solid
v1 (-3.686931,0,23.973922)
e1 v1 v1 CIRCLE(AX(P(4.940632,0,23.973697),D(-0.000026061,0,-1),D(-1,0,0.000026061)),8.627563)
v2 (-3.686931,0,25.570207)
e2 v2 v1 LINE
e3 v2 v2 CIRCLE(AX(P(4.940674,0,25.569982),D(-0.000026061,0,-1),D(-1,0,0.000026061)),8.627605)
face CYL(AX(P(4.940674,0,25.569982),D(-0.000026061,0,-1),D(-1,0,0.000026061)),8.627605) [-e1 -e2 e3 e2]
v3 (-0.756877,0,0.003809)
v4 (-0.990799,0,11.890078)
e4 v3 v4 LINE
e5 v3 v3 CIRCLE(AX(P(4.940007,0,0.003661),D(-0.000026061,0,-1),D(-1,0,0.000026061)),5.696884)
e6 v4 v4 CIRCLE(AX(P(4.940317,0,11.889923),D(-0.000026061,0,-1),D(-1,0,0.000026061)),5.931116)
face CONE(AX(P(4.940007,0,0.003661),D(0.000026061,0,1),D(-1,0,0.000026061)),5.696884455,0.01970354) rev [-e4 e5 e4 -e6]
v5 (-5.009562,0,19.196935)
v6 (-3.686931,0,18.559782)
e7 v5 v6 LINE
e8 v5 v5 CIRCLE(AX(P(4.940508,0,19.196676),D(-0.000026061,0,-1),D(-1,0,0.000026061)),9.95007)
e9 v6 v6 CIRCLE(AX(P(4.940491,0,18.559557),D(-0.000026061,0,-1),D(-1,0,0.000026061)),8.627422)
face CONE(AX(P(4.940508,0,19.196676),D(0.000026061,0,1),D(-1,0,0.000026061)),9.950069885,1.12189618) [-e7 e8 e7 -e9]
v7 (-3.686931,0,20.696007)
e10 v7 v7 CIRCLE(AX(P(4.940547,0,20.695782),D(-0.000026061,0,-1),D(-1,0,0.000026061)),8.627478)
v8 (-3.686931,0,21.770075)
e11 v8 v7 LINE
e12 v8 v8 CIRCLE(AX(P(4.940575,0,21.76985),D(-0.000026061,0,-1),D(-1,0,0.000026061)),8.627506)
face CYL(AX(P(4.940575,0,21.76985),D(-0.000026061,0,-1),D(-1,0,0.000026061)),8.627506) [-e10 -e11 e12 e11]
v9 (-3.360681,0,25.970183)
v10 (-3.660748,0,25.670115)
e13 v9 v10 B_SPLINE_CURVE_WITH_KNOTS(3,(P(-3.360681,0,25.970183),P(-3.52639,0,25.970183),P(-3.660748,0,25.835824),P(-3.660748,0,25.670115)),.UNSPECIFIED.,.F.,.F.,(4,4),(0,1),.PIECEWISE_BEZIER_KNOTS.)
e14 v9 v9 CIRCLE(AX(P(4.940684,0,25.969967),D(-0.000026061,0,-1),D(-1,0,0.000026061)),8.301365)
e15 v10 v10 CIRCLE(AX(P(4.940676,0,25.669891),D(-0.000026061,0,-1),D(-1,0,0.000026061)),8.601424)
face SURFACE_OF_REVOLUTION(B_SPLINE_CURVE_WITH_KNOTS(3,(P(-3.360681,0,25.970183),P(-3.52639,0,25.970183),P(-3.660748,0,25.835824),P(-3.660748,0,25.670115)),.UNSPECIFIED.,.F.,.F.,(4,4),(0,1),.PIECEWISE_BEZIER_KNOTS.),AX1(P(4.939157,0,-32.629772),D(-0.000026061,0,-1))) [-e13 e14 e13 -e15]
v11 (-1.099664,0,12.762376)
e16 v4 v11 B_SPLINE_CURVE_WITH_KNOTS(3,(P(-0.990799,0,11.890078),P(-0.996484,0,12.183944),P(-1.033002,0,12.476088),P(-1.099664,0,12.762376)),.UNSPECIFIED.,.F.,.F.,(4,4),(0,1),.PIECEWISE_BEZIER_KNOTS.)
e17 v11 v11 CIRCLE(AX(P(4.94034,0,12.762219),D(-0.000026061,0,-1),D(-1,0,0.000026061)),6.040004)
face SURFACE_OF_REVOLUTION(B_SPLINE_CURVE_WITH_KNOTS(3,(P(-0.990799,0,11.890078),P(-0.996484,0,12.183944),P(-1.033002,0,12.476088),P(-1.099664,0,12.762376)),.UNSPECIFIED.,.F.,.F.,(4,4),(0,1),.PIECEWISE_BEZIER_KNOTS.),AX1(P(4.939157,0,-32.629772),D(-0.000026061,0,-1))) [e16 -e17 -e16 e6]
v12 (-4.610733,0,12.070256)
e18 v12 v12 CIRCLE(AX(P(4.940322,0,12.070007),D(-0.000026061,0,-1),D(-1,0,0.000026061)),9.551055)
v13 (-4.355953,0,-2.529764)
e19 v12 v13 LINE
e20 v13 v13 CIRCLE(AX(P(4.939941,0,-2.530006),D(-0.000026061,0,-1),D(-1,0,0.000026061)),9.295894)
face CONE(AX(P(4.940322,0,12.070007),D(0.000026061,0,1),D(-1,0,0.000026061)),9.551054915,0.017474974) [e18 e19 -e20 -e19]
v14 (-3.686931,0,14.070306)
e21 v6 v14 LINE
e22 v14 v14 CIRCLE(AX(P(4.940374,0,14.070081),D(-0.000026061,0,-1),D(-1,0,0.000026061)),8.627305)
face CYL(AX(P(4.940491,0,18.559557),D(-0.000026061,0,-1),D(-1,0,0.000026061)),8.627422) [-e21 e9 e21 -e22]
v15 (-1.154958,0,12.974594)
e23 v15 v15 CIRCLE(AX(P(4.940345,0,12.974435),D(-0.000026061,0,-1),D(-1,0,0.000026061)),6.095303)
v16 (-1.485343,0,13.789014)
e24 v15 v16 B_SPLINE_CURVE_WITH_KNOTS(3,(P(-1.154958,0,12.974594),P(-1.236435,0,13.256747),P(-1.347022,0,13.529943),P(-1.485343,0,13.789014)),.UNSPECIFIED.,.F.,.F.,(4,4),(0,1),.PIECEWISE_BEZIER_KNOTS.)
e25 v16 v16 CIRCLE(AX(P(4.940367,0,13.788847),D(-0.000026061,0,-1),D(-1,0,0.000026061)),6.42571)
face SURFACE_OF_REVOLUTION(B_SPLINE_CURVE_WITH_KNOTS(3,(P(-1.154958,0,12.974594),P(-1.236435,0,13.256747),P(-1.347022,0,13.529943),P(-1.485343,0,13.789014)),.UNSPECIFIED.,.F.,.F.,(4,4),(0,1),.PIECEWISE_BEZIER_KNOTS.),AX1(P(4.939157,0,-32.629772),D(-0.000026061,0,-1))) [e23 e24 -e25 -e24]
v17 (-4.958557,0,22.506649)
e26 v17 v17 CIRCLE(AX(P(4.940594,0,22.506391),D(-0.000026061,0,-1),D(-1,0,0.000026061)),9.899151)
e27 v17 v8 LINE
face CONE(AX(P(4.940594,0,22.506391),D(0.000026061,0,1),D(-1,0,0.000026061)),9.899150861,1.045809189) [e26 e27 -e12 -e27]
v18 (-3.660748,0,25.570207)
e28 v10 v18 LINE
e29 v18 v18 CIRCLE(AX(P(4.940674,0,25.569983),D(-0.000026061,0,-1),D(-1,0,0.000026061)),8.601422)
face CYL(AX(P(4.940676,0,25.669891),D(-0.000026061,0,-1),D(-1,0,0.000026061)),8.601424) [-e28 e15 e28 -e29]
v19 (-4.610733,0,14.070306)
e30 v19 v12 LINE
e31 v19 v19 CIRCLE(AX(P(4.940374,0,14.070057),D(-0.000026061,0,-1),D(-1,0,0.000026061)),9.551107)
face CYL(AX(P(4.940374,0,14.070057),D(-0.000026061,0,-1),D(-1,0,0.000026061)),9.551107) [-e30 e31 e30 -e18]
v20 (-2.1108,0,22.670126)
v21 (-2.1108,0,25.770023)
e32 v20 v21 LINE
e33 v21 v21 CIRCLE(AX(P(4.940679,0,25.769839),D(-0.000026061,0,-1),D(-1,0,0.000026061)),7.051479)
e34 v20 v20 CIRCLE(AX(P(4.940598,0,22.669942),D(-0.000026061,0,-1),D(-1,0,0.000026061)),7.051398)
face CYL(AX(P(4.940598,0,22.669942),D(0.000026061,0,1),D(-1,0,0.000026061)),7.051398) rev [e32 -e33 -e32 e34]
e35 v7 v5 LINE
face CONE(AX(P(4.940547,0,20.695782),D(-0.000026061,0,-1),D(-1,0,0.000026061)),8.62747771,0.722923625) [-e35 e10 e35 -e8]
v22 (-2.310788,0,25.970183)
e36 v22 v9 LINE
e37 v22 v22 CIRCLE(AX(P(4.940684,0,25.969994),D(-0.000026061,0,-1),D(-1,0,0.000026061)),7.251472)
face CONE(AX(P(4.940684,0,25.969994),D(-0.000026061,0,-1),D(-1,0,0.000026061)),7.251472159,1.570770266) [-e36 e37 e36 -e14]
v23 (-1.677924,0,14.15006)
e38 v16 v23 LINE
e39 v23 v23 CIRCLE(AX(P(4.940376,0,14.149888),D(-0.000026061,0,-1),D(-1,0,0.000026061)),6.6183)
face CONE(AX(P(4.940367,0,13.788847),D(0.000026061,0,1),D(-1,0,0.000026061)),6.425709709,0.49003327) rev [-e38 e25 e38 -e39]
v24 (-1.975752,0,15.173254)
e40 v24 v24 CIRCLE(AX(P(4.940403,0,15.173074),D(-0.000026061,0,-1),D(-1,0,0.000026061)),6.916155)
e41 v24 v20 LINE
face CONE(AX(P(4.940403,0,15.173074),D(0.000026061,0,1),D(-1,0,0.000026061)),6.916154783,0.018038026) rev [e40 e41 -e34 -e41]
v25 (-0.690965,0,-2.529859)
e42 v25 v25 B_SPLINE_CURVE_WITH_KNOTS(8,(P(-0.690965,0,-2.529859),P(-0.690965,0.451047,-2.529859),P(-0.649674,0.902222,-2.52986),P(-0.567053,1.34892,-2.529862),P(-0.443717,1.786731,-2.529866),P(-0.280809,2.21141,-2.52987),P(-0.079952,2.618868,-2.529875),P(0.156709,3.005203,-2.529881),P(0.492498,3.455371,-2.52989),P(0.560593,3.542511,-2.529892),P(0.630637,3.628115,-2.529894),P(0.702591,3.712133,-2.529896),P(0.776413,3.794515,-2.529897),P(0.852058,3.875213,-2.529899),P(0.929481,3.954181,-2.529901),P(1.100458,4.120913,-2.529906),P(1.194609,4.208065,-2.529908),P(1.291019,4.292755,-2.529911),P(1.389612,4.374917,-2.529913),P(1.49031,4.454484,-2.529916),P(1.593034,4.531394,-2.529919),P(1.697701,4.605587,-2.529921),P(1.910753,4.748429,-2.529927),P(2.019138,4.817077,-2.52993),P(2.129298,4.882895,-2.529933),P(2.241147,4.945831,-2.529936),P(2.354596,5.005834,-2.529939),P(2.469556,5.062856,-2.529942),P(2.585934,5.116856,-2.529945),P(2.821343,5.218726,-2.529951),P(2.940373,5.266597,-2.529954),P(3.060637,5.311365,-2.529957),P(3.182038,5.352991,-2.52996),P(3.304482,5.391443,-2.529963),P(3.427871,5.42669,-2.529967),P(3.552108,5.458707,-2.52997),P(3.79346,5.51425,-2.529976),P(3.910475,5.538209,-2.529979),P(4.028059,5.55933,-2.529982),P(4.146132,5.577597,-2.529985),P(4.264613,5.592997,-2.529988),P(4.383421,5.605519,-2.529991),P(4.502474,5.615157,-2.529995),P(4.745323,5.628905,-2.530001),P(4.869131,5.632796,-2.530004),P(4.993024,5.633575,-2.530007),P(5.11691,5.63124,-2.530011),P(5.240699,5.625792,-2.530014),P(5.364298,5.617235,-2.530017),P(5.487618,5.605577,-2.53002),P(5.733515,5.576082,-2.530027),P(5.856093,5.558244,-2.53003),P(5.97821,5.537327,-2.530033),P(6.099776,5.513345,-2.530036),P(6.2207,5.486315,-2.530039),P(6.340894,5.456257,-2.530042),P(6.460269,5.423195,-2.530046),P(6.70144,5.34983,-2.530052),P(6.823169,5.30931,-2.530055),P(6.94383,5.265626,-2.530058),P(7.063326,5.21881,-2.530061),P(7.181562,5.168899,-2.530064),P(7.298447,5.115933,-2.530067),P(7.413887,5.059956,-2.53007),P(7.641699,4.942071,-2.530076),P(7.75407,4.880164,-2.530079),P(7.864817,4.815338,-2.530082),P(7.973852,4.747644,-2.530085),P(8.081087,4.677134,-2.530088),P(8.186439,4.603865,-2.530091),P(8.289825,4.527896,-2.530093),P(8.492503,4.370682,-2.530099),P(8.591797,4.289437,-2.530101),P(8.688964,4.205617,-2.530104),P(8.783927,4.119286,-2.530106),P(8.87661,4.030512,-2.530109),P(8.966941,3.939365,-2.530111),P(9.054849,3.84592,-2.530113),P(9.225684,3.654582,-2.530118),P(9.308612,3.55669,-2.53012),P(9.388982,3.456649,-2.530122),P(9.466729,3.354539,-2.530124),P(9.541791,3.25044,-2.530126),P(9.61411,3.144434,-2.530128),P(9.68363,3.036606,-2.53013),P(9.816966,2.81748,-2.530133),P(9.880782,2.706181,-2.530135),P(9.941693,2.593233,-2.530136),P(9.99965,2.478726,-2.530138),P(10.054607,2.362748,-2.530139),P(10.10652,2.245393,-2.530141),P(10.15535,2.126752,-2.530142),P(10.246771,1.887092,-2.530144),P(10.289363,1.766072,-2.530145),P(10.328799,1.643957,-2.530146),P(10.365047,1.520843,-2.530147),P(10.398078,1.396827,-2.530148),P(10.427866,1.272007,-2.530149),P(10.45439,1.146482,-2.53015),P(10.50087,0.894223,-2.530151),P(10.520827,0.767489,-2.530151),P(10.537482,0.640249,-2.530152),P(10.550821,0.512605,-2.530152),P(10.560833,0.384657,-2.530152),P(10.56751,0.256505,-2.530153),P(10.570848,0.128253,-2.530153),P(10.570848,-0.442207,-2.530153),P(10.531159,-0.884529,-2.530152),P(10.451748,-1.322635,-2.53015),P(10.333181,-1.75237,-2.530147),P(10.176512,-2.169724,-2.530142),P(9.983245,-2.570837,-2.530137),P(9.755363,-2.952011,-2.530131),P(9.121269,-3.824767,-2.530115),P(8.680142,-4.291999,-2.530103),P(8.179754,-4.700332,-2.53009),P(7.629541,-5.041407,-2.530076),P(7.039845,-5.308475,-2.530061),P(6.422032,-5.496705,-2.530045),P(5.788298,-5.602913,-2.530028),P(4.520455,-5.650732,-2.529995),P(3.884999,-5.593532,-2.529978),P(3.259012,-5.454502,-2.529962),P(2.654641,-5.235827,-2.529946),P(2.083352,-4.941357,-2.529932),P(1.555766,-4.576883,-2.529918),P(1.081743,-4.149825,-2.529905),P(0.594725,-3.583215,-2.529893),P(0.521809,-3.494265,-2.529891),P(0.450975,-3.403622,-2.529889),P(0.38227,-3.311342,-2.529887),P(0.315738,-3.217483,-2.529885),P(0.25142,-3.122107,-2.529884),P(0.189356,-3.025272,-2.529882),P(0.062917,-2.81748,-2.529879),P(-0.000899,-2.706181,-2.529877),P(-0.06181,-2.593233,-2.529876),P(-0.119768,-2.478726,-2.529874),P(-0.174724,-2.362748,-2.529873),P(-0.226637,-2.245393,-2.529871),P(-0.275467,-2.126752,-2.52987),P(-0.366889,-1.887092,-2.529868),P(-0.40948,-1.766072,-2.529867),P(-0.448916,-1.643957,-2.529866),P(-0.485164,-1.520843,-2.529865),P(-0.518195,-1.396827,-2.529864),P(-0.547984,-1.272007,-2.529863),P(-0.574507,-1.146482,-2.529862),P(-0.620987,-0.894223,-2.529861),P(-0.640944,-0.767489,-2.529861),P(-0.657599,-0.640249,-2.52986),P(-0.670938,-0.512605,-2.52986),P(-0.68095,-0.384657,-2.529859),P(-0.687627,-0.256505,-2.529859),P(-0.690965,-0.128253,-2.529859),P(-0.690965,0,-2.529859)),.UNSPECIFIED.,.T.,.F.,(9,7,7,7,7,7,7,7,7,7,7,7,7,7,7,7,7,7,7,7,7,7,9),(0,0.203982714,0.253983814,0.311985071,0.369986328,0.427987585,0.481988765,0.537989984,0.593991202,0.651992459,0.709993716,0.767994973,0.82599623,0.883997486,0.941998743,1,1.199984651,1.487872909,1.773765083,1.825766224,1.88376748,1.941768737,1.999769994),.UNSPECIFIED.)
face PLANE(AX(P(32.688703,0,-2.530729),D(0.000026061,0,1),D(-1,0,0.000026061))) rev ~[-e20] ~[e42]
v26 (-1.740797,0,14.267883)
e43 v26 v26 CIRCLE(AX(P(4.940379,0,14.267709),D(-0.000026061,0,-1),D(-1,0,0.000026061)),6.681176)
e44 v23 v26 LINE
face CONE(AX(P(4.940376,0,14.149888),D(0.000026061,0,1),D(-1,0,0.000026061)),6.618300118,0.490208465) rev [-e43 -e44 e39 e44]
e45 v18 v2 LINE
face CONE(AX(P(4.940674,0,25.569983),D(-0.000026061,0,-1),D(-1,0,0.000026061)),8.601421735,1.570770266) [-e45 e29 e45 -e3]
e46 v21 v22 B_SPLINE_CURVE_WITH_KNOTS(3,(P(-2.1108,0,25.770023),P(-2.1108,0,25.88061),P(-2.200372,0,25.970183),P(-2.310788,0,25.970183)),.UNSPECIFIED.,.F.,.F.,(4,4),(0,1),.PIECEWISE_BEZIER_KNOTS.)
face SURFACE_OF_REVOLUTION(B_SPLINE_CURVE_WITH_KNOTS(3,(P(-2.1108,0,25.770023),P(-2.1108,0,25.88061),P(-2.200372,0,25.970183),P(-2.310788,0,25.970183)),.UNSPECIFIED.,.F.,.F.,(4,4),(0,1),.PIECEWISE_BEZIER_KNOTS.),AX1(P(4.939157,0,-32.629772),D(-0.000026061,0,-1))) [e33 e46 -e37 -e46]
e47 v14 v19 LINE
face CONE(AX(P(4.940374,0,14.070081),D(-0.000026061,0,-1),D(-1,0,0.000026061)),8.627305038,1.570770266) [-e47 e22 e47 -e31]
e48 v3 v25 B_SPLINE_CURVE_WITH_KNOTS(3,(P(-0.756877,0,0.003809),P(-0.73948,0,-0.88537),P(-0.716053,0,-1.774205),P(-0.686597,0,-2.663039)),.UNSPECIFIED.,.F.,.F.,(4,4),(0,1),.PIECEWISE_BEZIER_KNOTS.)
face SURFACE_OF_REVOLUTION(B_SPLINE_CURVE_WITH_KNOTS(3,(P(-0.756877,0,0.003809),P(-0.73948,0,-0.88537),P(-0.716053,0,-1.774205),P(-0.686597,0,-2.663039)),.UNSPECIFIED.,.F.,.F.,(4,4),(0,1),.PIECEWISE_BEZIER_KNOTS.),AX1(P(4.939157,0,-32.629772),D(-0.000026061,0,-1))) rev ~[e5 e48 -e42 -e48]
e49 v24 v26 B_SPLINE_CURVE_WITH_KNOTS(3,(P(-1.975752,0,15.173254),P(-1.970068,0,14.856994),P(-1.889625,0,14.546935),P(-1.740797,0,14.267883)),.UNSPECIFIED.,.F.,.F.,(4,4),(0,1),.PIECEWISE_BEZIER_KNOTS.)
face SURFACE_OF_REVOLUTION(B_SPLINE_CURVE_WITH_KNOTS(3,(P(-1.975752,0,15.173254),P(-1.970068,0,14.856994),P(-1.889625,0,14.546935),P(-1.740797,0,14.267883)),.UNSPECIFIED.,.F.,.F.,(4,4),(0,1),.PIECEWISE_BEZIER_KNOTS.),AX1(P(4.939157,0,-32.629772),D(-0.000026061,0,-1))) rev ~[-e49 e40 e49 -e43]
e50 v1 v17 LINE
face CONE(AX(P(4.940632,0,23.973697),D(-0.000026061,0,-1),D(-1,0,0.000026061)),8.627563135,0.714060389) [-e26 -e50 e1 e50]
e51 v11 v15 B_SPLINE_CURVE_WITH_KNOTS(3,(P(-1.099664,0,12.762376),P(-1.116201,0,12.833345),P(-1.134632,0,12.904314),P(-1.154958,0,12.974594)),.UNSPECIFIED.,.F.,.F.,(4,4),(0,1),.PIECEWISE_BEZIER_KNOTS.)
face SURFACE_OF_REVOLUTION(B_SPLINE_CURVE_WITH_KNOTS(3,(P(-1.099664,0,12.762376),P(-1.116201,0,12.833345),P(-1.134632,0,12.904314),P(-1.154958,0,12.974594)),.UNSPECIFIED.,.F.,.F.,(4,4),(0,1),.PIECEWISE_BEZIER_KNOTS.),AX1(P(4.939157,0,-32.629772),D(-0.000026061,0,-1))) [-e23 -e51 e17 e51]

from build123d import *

# Parameters (mm, degrees)
F4_DEPTH      = 9.9510698867
F4_DEPTH_BACK = 9.9510698867


# Not quite as in the source:
# - ends of sketch curves that miss each other by under 0.0002 mm in the source are joined


with BuildPart() as f2:
    # F1 (on Front) → F2 (revolve)
    with BuildSketch(Plane.XZ):
        with BuildLine():
            Line((-0.756877, 0.003809), (-0.990799, 11.890078))
            add(Edge.make_bspline(
                [(-0.990799, 11.890078), (-0.996484, 12.183944), (-1.033002, 12.476088), (-1.099664, 12.762376)],
                knots=[0, 0, 0, 0, 1, 1, 1, 1], degree=3))
            add(Edge.make_bspline(
                [(-1.099664, 12.762376), (-1.116201, 12.833345), (-1.134632, 12.904314), (-1.154958, 12.974594)],
                knots=[0, 0, 0, 0, 1, 1, 1, 1], degree=3))
            add(Edge.make_bspline(
                [(-1.154958, 12.974594), (-1.236435, 13.256747), (-1.347022, 13.529943), (-1.485343, 13.789014)],
                knots=[0, 0, 0, 0, 1, 1, 1, 1], degree=3))
            Line((-1.485343, 13.789014), (-1.677924, 14.15006))
            Line((-1.677924, 14.15006), (-1.740797, 14.267883))
            add(Edge.make_bspline(
                [(-1.975752, 15.173254), (-1.970068, 14.856994), (-1.889625, 14.546935), (-1.740797, 14.267883)],
                knots=[0, 0, 0, 0, 1, 1, 1, 1], degree=3))
            Line((-1.975752, 15.173254), (-2.1108, 22.670126))
            Line((-2.1108, 22.670126), (-2.1108, 25.770023))
            add(Edge.make_bspline(
                [(-2.1108, 25.770023), (-2.1108, 25.88061), (-2.200372, 25.970183), (-2.310788, 25.970183)],
                knots=[0, 0, 0, 0, 1, 1, 1, 1], degree=3))
            Line((-2.310788, 25.970183), (-3.360681, 25.970183))
            add(Edge.make_bspline(
                [(-3.360681, 25.970183), (-3.52639, 25.970183), (-3.660748, 25.835824), (-3.660748, 25.670115)],
                knots=[0, 0, 0, 0, 1, 1, 1, 1], degree=3))
            Line((-3.660748, 25.670115), (-3.660748, 25.570207))
            Line((-3.660748, 25.570207), (-3.686931, 25.570207))
            Line((-3.686931, 25.570207), (-3.686931, 23.973922))
            Line((-3.686931, 23.973922), (-4.958556965, 22.5066486746))
            Line((-4.958556965, 22.5066486746), (-3.686931, 21.7700749636))
            Line((-3.686931, 21.7700749636), (-3.686931, 20.6960067153))
            Line((-3.686931, 20.6960067153), (-5.0095622428, 19.196934998))
            Line((-5.0095622428, 19.196934998), (-3.686931, 18.559782))
            Line((-3.686931, 18.559782), (-3.686931, 14.070306))
            Line((-3.686931, 14.070306), (-4.610733, 14.070306))
            Line((-4.610733, 14.070306), (-4.610733, 12.070256))
            Line((-4.610733, 12.070256), (-3.952894, -25.626775))
            ThreePointArc((-3.952894, -25.626775), (-3.2274904136, -27.9992970945), (-1.3549908614, -29.6268157026))
            Line((-1.3549908614, -29.6268157026), (1.23835, -30.835824))
            Line((1.23835, -30.835824), (1.660891, -30.929703))
            Line((1.660891, -30.929703), (2.028138, -30.929703))
            ThreePointArc((2.028138, -30.929703), (2.6539813799, -31.1498802042), (3.004306, -31.71329))
            Line((3.004306, -31.71329), (3.939132, -35.929743))
            Line((3.939132, -35.929743), (4.939071, -35.929743))
            Line((4.939071, -35.929743), (4.939243, -29.329801))
            Line((4.939243, -29.329801), (2.98553, -29.329801))
            add(Edge.make_bspline(
                [(2.732488, -29.297417), (2.814998, -29.318777), (2.900091, -29.329801), (2.98553, -29.329801)],
                knots=[0, 0, 0, 0, 1, 1, 1, 1], degree=3))
            add(Edge.make_bspline(
                [(2.67082, -29.278813), (2.691146, -29.285704), (2.711645, -29.291905), (2.732488, -29.297417)],
                knots=[0, 0, 0, 0, 1, 1, 1, 1], degree=3))
            add(Edge.make_bspline(
                [(2.44086, -29.16857), (2.512346, -29.215079), (2.589688, -29.251942), (2.67082, -29.278813)],
                knots=[0, 0, 0, 0, 1, 1, 1, 1], degree=3))
            Line((2.44086, -29.16857), (1.451946, -28.526405))
            add(Edge.make_bspline(
                [(0.087515, -26.109326), (0.119899, -27.0898), (0.629429, -27.99207), (1.451946, -28.526405)],
                knots=[0, 0, 0, 0, 1, 1, 1, 1], degree=3))
            Line((0.087515, -26.109326), (-0.686597, -2.663039))
            add(Edge.make_bspline(
                [(-0.756877, 0.003809), (-0.73948, -0.88537), (-0.716053, -1.774205), (-0.686597, -2.663039)],
                knots=[0, 0, 0, 0, 1, 1, 1, 1], degree=3))
        make_face()
    revolve(axis=Axis((4.939157, 0, -32.629772), (-2.60608e-05, 0, -0.9999999997)))

    # F3 (on Front) → F4 (cut, two sides)
    with BuildSketch(Plane.XZ) as f4_sk:
        Polygon((-27.1517578705, -2.5291696333), (-27.1517578705, -48.2453077242), (32.6887033687, -48.2453077242), (32.6887033687, -2.5307291257), align=None)
    extrude(amount=-F4_DEPTH, mode=Mode.SUBTRACT)
    extrude(f4_sk.sketch, amount=F4_DEPTH_BACK, mode=Mode.SUBTRACT)


solid = f2.part
